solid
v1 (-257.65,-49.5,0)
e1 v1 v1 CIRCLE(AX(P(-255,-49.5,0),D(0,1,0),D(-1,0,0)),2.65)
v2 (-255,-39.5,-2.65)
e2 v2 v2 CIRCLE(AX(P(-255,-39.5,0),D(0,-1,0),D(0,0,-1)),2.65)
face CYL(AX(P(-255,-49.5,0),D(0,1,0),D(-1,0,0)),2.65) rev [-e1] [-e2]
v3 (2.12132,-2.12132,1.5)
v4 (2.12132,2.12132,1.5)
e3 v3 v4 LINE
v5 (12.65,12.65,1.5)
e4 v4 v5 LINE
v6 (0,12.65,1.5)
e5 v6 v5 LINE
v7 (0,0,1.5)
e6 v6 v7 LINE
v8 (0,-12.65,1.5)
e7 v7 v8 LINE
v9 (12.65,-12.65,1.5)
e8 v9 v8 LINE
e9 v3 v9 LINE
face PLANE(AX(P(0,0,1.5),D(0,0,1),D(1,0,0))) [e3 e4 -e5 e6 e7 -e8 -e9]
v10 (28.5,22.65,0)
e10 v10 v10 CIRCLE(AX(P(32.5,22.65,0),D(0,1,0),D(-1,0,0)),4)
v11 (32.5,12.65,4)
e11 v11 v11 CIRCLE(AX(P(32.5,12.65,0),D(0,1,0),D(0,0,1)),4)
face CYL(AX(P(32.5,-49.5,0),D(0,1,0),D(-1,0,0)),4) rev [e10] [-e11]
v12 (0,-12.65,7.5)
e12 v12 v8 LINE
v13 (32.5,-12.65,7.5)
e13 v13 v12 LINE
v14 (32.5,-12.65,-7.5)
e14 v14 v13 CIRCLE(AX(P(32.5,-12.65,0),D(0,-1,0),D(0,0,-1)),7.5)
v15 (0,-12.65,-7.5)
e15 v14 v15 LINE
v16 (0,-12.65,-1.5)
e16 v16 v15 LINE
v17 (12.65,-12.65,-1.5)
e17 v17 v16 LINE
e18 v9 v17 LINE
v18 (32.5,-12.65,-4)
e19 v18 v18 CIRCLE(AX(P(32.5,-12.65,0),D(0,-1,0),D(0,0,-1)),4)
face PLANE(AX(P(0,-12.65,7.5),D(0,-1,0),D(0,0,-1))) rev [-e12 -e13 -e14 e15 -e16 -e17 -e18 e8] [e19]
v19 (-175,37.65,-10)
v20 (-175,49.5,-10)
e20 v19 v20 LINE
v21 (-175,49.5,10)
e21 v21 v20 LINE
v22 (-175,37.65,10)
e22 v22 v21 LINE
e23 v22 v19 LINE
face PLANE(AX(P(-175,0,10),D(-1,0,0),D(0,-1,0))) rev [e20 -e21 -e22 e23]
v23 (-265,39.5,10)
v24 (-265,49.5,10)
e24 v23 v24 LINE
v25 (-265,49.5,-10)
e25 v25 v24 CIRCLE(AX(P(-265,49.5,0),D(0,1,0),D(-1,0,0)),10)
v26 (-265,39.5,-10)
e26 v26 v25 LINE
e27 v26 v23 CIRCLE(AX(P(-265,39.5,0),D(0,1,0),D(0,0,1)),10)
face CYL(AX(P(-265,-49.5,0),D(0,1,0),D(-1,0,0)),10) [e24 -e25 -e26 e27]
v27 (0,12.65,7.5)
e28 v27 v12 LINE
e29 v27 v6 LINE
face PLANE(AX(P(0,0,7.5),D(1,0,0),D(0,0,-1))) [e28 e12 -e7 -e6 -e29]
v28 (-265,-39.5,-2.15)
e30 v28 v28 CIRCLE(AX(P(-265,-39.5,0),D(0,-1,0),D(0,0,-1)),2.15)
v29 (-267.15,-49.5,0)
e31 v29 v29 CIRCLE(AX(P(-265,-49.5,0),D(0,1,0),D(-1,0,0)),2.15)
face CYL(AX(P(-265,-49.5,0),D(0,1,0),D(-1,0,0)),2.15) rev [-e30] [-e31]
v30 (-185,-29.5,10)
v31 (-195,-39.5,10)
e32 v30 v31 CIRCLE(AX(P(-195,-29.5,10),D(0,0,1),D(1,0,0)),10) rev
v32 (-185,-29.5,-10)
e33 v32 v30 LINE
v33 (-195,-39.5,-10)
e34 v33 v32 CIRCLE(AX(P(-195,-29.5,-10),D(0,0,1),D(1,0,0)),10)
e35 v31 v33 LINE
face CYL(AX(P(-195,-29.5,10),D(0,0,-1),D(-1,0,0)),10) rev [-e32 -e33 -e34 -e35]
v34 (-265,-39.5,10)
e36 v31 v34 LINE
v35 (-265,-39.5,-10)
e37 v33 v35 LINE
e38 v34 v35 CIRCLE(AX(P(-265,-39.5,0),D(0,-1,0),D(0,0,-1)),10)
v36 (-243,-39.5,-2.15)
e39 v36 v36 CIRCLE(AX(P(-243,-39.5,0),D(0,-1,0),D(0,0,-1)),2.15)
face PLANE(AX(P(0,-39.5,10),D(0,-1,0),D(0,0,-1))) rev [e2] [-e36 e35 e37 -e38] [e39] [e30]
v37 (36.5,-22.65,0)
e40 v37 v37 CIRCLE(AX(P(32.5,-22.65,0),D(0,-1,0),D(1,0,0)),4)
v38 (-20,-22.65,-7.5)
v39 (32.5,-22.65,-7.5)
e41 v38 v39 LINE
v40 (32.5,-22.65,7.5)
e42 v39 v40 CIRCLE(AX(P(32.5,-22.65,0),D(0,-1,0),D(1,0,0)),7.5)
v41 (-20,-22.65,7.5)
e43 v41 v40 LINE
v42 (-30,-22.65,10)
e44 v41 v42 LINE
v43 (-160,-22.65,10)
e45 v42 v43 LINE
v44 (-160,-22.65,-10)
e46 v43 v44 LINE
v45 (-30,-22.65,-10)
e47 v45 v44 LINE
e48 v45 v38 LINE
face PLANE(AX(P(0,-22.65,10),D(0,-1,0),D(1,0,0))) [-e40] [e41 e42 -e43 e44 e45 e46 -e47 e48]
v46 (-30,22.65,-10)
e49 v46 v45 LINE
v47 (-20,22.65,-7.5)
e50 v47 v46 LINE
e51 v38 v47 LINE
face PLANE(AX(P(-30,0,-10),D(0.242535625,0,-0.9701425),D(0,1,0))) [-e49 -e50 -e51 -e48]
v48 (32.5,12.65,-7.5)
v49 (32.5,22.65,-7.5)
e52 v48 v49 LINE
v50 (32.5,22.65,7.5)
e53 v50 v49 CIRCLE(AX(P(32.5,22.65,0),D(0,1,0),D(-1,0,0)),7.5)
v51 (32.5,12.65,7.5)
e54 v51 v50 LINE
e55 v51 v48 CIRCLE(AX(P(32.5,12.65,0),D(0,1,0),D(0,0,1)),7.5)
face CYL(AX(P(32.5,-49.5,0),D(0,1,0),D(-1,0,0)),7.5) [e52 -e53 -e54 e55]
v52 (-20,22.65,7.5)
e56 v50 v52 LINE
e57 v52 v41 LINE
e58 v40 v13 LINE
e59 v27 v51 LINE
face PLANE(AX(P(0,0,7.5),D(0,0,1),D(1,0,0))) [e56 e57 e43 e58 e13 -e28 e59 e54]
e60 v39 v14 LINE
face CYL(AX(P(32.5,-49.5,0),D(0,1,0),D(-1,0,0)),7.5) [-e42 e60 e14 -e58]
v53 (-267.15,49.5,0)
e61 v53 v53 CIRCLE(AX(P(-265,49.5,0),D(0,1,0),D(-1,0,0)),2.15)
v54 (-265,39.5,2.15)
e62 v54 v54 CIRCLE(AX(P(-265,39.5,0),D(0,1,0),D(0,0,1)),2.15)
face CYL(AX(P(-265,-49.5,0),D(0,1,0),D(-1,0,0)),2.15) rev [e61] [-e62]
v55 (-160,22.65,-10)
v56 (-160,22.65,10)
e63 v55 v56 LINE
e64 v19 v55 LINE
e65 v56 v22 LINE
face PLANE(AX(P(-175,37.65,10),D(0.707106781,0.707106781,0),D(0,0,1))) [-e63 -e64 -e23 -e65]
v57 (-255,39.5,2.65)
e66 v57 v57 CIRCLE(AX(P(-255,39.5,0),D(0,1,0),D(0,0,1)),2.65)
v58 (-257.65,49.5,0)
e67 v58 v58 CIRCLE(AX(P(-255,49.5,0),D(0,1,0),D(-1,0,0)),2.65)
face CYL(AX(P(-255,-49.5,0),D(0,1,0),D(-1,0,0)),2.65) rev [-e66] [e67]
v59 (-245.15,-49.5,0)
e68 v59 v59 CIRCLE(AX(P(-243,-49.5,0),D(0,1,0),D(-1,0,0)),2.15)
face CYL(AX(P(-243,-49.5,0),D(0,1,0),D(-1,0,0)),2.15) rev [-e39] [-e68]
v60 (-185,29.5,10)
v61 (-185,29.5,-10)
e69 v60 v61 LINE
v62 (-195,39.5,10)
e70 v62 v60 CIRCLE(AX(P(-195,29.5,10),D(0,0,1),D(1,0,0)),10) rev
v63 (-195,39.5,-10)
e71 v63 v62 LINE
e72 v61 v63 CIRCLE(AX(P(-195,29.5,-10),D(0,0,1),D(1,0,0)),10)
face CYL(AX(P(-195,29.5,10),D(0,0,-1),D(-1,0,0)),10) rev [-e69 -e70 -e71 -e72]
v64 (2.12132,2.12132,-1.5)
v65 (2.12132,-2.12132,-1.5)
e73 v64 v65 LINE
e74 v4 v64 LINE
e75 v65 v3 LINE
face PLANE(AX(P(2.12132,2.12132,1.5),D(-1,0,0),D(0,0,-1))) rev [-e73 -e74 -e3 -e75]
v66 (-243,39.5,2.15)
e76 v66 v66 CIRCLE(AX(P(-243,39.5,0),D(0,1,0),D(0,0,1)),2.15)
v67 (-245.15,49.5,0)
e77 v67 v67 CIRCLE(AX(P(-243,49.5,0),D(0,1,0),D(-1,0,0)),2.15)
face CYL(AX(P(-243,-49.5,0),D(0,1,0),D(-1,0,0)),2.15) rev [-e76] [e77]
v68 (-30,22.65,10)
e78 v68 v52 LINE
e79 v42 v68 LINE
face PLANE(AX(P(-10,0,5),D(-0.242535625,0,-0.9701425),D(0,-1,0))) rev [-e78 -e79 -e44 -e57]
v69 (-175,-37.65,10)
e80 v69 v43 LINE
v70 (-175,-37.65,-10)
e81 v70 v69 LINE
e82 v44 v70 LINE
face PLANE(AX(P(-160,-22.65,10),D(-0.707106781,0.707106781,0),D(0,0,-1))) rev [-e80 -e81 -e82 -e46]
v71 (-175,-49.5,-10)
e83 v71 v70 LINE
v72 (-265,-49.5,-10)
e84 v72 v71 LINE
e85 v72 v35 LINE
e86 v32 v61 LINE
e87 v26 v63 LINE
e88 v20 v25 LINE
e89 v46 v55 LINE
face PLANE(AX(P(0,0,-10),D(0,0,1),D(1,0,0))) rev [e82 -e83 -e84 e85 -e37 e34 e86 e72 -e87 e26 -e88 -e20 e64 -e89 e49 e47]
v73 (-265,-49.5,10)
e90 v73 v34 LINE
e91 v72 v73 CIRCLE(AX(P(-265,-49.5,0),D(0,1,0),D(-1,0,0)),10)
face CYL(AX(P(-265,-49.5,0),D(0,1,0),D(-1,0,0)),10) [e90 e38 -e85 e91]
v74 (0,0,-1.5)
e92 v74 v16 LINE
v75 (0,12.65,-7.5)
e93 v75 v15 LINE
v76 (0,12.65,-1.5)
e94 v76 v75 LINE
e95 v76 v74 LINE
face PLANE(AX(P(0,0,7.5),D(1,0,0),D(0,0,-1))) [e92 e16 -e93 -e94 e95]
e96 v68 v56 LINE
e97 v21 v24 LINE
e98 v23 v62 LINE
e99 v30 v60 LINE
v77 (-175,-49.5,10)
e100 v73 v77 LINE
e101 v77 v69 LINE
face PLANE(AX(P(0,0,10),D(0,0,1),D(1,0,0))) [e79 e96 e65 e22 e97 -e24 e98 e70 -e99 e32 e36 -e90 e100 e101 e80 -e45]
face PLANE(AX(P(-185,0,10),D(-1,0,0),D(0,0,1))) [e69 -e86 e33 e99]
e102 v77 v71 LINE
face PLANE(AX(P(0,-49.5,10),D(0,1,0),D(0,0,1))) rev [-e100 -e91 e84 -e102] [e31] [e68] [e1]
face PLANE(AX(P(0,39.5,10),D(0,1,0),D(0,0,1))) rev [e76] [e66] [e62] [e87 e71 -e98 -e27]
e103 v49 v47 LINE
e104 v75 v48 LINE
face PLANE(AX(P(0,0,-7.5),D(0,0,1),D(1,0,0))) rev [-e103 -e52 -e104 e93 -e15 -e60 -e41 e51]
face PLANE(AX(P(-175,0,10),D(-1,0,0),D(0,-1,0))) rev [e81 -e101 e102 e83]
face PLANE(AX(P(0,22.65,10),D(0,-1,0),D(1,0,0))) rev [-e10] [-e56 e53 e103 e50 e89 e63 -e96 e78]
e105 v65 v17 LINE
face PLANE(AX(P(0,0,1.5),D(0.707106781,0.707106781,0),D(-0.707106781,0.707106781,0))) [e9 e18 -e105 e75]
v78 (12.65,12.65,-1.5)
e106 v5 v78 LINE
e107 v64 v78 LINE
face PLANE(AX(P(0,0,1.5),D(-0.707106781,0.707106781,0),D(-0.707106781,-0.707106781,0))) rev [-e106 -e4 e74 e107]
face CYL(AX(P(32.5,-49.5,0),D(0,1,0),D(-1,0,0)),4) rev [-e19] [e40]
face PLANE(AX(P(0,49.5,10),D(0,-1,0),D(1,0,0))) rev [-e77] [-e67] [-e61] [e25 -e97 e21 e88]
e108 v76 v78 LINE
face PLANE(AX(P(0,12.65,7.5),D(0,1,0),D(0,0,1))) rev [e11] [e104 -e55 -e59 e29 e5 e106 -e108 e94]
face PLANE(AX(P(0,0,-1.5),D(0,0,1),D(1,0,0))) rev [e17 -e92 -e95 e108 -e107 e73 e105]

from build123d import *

# Parameters (mm, degrees)
SKETCH_2_W          = 165
SKETCH_2_H          = 45.3
EXTRUDE_1_DEPTH     = 10
EXTRUDE_2_DEPTH     = 7.5
CHAMFER_1_SIZE      = 20
CHAMFER_1_SIZE_2    = 5
CHAMFER_2_SIZE      = 5
CHAMFER_2_SIZE_2    = 20
EXTRUDE_3_DEPTH     = 1.5
CHAMFER_3_SIZE      = 3
CUT_EXTRUDE_1_DEPTH = 293.448286027
CUT_EXTRUDE_2_DEPTH = 285.483079462
CHAMFER_4_SIZE      = 15
FILLET_1_R          = 10


with BuildPart() as part:
    # 草图2 → 凸台-拉伸1 (new, symmetric)
    with BuildSketch(Plane.XY):
        with Locations((-92.5, 0)):
            Rectangle(SKETCH_2_W, SKETCH_2_H)
        Polygon((-275, 49.5), (-275, 39.5), (-185, 39.5), (-185, -39.5), (-275, -39.5), (-275, -49.5), (-175, -49.5), (-175, 49.5), align=None)
    extrude(amount=EXTRUDE_1_DEPTH, both=True)

    # 草图2<3> → 凸台-拉伸2 (add, symmetric)
    with BuildSketch(Plane.XY):
        Polygon((40, -22.65), (40, -12.65), (0, -12.65), (0, 12.65), (40, 12.65), (40, 22.65), (-10, 22.65), (-10, -22.65), align=None)
    extrude(amount=EXTRUDE_2_DEPTH, both=True)

    # 倒角1
    # the kernel refuses this chamfer: 20, 5 mm, written as the material it takes off along each edge
    with BuildSketch(Plane(origin=(-10, -74.592549995, 10), x_dir=(-0.9999563942249224, 0, 0.00933861064031752), z_dir=(0, 1, 0))) as chamfer_1_piece_1_section:
        Polygon((CHAMFER_1_SIZE * 0.999956394225, -CHAMFER_1_SIZE * 0.00933861064032), (-CHAMFER_1_SIZE_2 * 0.00933861064032, -CHAMFER_1_SIZE_2 * 0.999956394225), (0, 0), align=None)
    chamfer_1_piece_1 = extrude(amount=149.185099991, mode=Mode.PRIVATE)
    chamfer_1_piece_1 = split(chamfer_1_piece_1, bisect_by=Plane(origin=(-18.245866107, 0, 7.5), z_dir=(0, 0, 1)), keep=Keep.TOP, mode=Mode.PRIVATE)
    add(chamfer_1_piece_1, mode=Mode.SUBTRACT)

    # 倒角2
    # the kernel refuses this chamfer: 20, 5 mm, written as the material it takes off along each edge
    with BuildSketch(Plane(origin=(-10, -74.592549995, -10), x_dir=(0.14778356633657133, 0, 0.9890197255468893), z_dir=(0, 1, 0))) as chamfer_2_piece_1_section:
        Polygon((CHAMFER_2_SIZE * 0.989019725547, -CHAMFER_2_SIZE * 0.147783566337), (-CHAMFER_2_SIZE_2 * 0.147783566337, -CHAMFER_2_SIZE_2 * 0.989019725547), (0, 0), align=None)
    chamfer_2_piece_1 = extrude(amount=149.185099991, mode=Mode.PRIVATE)
    chamfer_2_piece_1 = split(chamfer_2_piece_1, bisect_by=Plane(origin=(-18.245866107, 0, -7.5), z_dir=(0, 0, -1)), keep=Keep.TOP, mode=Mode.PRIVATE)
    add(chamfer_2_piece_1, mode=Mode.SUBTRACT)

    # 草图2<5> → 凸台-拉伸3 (add, symmetric)
    with BuildSketch(Plane.XY):
        Polygon((12.65, 12.65), (0, 12.65), (0, 0), align=None)
        Polygon((12.65, -12.65), (0, 0), (0, -12.65), align=None)
    extrude(amount=EXTRUDE_3_DEPTH, both=True)

    # 倒角3
    chamfer_3_edges = [part.edges().sort_by_distance(p)[0] for p in [
        (0, 0, 0),
    ]]
    chamfer(chamfer_3_edges, length=CHAMFER_3_SIZE)

    # 草图3 → 切除-拉伸1 (cut, through all)
    with BuildSketch(Plane(origin=(0, 49.5, 0), x_dir=(1, 0, 0), z_dir=(0, 1, 0))):
        with BuildLine():
            ThreePointArc((-275, 0), (-272.071067812, 7.071067812), (-265, 10))
            Line((-265, 10), (-275, 10))
            Line((-275, 10), (-275, 0))
        make_face()
        with BuildLine():
            Line((-275, -10), (-265, -10))
            ThreePointArc((-265, -10), (-272.071067812, -7.071067812), (-275, 0))
            Line((-275, 0), (-275, -10))
        make_face()
        with BuildLine():
            ThreePointArc((-267.15, 0), (-265, -2.15), (-262.85, 0))
            Line((-262.85, 0), (-267.15, 0))
        make_face()
        with BuildLine():
            Line((-267.15, 0), (-262.85, 0))
            ThreePointArc((-262.85, 0), (-265, 2.15), (-267.15, 0))
        make_face()
        with BuildLine():
            ThreePointArc((-257.65, 0), (-255, -2.65), (-252.35, 0))
            Line((-252.35, 0), (-257.65, 0))
        make_face()
        with BuildLine():
            Line((-257.65, 0), (-252.35, 0))
            ThreePointArc((-252.35, 0), (-255, 2.65), (-257.65, 0))
        make_face()
        with BuildLine():
            ThreePointArc((-245.15, 0), (-243, -2.15), (-240.85, 0))
            Line((-240.85, 0), (-245.15, 0))
        make_face()
        with BuildLine():
            Line((-245.15, 0), (-240.85, 0))
            ThreePointArc((-240.85, 0), (-243, 2.15), (-245.15, 0))
        make_face()
    extrude(amount=-CUT_EXTRUDE_1_DEPTH, mode=Mode.SUBTRACT)

    # 草图4 → 切除-拉伸2 (cut, through all)
    with BuildSketch(Plane(origin=(0, 22.65, 0), x_dir=(1, 0, 0), z_dir=(0, 1, 0))):
        with BuildLine():
            ThreePointArc((28.5, 0), (32.5, -4), (36.5, 0))
            Line((36.5, 0), (28.5, 0))
        make_face()
        with BuildLine():
            Line((28.5, 0), (36.5, 0))
            ThreePointArc((36.5, 0), (32.5, 4), (28.5, 0))
        make_face()
        with BuildLine():
            ThreePointArc((32.5, 7.5), (37.803300859, 5.303300859), (40, 0))
            Line((40, 0), (40, 7.5))
            Line((40, 7.5), (32.5, 7.5))
        make_face()
        with BuildLine():
            Line((40, -7.5), (40, 0))
            ThreePointArc((40, 0), (37.80330088, -5.303300838), (32.500000061, -7.5))
            Line((32.500000061, -7.5), (40, -7.5))
        make_face()
    extrude(amount=-CUT_EXTRUDE_2_DEPTH, mode=Mode.SUBTRACT)

    # 倒角4
    chamfer_4_edges = [part.edges().sort_by_distance(p)[0] for p in [
        (-175, -22.65, 0),
        (-175, 22.65, 0),
    ]]
    chamfer(chamfer_4_edges, length=CHAMFER_4_SIZE)

    # 圆角1
    fillet_1_edges = [part.edges().sort_by_distance(p)[0] for p in [
        (-185, -39.5, 0),
        (-185, 39.5, 0),
    ]]
    fillet(fillet_1_edges, radius=FILLET_1_R)


solid = part.part
